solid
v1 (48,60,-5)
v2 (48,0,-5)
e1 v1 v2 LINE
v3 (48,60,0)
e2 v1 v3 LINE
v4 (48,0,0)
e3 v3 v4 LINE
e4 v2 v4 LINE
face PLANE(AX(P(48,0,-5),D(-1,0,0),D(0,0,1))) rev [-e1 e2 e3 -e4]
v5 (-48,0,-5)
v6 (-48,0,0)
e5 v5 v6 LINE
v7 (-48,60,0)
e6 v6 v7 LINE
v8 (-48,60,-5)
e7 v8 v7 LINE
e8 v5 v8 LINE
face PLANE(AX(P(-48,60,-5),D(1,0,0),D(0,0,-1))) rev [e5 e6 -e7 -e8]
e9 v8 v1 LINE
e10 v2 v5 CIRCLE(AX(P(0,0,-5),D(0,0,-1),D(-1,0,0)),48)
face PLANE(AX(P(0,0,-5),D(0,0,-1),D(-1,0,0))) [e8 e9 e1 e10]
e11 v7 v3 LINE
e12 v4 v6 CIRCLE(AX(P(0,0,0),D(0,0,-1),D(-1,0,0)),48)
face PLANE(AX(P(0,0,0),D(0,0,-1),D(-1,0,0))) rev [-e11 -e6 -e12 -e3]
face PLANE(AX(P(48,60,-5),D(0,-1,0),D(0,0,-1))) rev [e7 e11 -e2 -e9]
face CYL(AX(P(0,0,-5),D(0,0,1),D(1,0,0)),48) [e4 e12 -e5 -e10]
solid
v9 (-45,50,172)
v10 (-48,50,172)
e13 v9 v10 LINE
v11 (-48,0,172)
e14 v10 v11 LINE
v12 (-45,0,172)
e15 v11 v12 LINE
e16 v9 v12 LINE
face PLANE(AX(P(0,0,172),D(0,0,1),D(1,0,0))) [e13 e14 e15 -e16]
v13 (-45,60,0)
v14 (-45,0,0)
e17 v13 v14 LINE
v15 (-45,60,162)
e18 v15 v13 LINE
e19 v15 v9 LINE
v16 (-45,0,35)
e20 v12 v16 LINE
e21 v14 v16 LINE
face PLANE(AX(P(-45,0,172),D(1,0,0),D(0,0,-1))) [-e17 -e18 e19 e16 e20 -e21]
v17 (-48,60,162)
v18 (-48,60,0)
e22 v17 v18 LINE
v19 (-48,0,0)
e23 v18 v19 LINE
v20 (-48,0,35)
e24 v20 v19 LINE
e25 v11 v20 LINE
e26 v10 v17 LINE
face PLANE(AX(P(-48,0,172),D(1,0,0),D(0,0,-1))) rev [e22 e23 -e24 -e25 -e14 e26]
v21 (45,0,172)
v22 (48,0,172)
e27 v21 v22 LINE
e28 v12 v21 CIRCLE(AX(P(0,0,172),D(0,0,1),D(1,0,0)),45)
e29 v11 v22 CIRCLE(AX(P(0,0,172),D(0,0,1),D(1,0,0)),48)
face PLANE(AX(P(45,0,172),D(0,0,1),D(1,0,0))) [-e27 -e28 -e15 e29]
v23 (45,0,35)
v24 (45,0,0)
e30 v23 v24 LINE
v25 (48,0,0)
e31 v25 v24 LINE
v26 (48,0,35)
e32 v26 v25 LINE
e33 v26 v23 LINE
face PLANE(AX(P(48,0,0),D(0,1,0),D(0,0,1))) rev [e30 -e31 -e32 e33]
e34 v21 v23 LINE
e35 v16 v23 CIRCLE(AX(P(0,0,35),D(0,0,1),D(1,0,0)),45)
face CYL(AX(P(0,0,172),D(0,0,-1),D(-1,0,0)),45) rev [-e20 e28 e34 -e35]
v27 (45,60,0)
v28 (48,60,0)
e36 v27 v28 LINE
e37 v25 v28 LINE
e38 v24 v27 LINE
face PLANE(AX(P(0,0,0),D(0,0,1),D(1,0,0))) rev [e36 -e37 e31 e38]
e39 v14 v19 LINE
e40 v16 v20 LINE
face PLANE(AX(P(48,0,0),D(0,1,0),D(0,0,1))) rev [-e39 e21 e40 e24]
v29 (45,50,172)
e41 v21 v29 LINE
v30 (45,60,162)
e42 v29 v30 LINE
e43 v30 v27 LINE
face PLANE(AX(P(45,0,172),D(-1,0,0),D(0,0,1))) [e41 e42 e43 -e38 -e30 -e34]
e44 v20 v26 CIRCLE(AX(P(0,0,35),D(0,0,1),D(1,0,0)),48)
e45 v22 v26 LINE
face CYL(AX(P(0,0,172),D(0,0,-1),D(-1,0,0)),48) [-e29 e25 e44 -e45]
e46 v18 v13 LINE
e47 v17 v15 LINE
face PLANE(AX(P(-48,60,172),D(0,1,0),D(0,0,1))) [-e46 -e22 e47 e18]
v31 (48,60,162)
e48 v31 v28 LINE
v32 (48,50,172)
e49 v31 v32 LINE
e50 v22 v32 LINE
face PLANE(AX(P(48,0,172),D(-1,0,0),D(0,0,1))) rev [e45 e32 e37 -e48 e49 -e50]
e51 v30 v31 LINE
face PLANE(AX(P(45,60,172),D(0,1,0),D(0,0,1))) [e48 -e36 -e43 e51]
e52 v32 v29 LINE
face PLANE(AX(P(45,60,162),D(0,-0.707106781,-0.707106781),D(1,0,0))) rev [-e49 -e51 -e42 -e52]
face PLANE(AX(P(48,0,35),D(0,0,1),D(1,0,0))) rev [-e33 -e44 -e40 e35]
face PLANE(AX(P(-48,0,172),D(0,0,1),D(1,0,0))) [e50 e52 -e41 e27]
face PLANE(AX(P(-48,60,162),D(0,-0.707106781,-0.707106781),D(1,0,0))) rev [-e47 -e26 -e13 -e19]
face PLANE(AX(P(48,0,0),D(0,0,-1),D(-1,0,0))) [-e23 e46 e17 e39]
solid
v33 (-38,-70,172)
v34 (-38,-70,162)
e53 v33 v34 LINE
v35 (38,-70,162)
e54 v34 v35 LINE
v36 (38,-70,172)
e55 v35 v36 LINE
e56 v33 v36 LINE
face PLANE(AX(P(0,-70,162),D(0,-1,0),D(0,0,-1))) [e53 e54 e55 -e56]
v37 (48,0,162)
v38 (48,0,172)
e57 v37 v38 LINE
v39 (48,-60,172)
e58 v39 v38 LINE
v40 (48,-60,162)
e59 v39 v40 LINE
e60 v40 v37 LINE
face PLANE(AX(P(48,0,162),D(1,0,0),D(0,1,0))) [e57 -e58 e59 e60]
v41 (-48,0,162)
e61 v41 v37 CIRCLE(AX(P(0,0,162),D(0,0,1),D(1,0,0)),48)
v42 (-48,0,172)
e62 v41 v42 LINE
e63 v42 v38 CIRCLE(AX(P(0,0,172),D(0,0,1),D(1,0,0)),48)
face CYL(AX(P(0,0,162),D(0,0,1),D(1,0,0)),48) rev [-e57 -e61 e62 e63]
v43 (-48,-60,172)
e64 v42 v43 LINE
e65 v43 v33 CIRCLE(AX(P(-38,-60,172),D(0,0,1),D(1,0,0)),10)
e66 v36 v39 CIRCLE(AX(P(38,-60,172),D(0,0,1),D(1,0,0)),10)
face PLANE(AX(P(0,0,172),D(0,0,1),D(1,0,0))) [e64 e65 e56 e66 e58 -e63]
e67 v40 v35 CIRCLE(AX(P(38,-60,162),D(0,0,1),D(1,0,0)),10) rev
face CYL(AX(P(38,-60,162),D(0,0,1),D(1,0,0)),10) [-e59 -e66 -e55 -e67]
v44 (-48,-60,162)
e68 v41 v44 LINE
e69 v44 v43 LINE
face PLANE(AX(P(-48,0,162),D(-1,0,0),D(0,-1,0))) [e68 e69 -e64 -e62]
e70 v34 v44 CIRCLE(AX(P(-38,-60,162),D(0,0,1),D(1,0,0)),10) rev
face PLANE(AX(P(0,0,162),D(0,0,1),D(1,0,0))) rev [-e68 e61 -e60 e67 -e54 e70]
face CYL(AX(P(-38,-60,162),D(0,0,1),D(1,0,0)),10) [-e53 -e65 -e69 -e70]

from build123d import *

# Parameters (mm, degrees)
BASE_FLANGE1_DEPTH  = 172
BOSS_EXTRUDE1_DEPTH = 5
SKETCH7_W           = 35
SKETCH7_H           = 48
CUT_EXTRUDE1_DEPTH  = 206.91260282
BOSS_EXTRUDE2_DEPTH = 10
FILLET1_R           = 10
CHAMFER1_SIZE       = 10


# Read off the part's stored shape, not the designer's step: Base-Flange1
with BuildPart() as part:
    # Base-Flange1 outline → Base-Flange1 (new body)
    with BuildSketch(Plane.XY):
        with BuildLine():
            Line((48, 0), (48, 60))
            Line((48, 60), (45, 60))
            Line((45, 60), (45, 0))
            ThreePointArc((45, 0), (0, -45), (-45, 0))
            Line((-45, 0), (-45, 60))
            Line((-45, 60), (-48, 60))
            Line((-48, 60), (-48, 0))
            ThreePointArc((-48, 0), (0, -48), (48, 0))
        make_face()
    extrude(amount=BASE_FLANGE1_DEPTH)

    # Sketch7 → Cut-Extrude1 (cut, through all)
    with BuildSketch(Plane.ZY.offset(48)):
        with Locations((17.5, -24)):
            Rectangle(SKETCH7_W, SKETCH7_H)
    extrude(amount=-CUT_EXTRUDE1_DEPTH, mode=Mode.SUBTRACT)

    # Chamfer1
    chamfer1_edges = [part.edges().sort_by_distance(p)[0] for p in [
        (-46.5, 60, 172),
        (46.5, 60, 172),
    ]]
    chamfer(chamfer1_edges, length=CHAMFER1_SIZE)


with BuildPart() as body_2:
    # Sketch6 → Boss-Extrude1 (new body)
    with BuildSketch(Plane(origin=(0, 0, 0), x_dir=(-1, 0, 0), z_dir=(0, 0, -1))):
        with BuildLine():
            Line((48, 60), (48, 0))
            ThreePointArc((48, 0), (0, -48), (-48, 0))
            Line((-48, 0), (-48, 60))
            Line((-48, 60), (48, 60))
        make_face()
    extrude(amount=BOSS_EXTRUDE1_DEPTH)


with BuildPart() as body_3:
    # Sketch8 → Boss-Extrude2 (new body)
    with BuildSketch(Plane.XY.offset(172)):
        with BuildLine():
            Line((-48, -70), (48, -70))
            Line((48, -70), (48, 0))
            ThreePointArc((48, 0), (0, -48), (-48, 0))
            Line((-48, 0), (-48, -70))
        make_face()
    extrude(amount=-BOSS_EXTRUDE2_DEPTH)

    # Fillet1
    fillet1_edges = [body_3.edges().sort_by_distance(p)[0] for p in [
        (-48, -70, 167),
        (48, -70, 167),
    ]]
    fillet(fillet1_edges, radius=FILLET1_R)


solid = Compound([part.part, body_2.part, body_3.part])
